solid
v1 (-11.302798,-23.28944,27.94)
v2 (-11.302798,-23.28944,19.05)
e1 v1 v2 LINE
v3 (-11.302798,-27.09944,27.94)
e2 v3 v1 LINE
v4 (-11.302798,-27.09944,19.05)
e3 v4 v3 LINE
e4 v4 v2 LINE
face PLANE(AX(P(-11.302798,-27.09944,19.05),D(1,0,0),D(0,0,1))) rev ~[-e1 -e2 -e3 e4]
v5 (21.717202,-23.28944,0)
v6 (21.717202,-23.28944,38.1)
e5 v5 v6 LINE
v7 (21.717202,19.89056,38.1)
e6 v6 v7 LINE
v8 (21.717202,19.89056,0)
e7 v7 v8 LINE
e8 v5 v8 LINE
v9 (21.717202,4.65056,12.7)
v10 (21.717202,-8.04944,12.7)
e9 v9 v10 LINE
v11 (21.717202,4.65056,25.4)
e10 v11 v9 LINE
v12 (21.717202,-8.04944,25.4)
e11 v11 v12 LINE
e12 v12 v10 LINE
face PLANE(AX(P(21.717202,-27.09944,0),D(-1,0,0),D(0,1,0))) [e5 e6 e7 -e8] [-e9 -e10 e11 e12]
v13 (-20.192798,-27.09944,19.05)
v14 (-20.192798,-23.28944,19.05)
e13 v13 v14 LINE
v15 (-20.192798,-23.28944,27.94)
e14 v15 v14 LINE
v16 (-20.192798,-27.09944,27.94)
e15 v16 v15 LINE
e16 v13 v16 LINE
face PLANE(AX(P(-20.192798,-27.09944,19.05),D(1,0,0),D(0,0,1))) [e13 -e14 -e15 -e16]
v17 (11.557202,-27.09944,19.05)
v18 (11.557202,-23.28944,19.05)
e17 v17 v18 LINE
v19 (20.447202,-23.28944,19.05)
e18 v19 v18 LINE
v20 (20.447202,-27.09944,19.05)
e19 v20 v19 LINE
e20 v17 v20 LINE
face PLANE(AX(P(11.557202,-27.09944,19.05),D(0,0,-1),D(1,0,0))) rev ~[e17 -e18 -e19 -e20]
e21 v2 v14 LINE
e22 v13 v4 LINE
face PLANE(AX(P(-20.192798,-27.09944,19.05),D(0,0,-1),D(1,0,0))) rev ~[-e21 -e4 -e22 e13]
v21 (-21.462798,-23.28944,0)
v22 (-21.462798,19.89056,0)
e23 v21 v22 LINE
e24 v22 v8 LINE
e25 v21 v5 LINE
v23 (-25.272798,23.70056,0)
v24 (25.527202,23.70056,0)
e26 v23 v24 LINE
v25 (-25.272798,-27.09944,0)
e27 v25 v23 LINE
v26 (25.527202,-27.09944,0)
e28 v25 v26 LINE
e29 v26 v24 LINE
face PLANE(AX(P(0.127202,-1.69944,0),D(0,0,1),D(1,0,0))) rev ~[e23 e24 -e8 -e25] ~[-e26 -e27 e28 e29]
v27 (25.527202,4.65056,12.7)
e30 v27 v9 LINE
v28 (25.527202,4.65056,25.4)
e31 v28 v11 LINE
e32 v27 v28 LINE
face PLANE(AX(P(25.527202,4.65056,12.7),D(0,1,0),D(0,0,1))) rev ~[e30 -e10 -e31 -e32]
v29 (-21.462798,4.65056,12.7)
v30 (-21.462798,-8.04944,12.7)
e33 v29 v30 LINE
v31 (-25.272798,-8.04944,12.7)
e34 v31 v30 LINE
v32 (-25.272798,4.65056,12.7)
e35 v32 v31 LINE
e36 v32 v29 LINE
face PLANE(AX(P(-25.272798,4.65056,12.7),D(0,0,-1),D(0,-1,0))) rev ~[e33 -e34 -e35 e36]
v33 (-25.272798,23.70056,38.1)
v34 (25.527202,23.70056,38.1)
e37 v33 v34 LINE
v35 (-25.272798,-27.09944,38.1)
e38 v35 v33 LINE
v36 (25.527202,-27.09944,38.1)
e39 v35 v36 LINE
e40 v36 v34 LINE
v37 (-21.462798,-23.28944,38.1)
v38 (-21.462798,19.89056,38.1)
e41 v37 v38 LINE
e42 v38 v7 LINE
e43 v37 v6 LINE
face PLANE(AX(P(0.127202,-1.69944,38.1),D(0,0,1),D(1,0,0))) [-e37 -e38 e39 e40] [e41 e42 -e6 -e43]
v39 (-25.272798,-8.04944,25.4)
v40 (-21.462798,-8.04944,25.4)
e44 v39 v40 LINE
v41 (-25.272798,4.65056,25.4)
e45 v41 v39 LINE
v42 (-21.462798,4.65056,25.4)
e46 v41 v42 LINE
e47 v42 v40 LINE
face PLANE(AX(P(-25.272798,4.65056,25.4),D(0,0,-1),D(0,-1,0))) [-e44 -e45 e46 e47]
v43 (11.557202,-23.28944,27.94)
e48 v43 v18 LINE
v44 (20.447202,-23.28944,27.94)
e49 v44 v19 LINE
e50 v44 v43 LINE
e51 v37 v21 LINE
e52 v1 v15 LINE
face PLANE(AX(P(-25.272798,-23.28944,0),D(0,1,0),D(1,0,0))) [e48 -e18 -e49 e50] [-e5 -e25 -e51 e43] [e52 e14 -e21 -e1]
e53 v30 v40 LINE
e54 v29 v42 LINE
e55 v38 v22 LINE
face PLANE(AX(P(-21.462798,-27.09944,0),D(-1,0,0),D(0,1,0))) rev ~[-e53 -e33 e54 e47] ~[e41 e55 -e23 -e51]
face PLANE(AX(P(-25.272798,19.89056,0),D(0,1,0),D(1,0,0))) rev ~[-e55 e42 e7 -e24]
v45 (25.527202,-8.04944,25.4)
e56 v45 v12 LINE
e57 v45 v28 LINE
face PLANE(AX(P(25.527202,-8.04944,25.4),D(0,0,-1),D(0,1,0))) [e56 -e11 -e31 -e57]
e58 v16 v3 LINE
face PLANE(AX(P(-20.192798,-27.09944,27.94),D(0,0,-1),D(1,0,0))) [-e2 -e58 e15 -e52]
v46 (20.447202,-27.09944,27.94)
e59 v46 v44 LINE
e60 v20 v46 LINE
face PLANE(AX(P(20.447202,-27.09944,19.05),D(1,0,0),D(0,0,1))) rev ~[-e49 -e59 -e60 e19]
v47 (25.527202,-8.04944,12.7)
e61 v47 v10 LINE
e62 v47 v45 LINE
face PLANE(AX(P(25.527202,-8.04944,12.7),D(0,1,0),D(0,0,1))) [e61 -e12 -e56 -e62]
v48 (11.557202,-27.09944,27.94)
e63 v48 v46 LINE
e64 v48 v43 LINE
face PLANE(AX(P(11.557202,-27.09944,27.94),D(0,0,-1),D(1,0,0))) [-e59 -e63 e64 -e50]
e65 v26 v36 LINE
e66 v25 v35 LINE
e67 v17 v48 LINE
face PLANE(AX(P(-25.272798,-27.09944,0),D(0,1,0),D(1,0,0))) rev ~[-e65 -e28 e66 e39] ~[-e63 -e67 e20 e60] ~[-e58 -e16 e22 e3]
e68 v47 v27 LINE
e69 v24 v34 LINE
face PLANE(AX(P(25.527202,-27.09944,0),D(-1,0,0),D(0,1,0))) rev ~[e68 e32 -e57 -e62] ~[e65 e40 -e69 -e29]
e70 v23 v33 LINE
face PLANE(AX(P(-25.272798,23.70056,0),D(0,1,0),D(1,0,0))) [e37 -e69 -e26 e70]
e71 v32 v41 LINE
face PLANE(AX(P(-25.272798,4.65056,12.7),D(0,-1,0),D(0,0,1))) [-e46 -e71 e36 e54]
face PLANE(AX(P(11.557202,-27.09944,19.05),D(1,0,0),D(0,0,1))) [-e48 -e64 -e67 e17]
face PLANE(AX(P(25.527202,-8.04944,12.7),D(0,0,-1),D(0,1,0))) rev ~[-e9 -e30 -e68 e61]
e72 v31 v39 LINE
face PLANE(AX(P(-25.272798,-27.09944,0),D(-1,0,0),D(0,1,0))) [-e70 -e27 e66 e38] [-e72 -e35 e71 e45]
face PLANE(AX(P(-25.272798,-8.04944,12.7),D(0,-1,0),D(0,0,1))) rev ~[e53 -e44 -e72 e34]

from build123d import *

# Parameters (mm, degrees)
F0_W      = 50.8
F0_H      = 50.8
F1_DEPTH  = 38.1
F2_T      = -3.81
F10_W     = 12.7
F10_H     = 12.7
F11_DEPTH = 25.4
F12_W     = 12.7
F12_H     = 12.7
F13_DEPTH = 25.4
F14_W     = 8.89
F14_H     = 8.89
F15_DEPTH = 25.4


# Not quite as in the source:
# - the program builds the solid bodies; features that only make, move or delete a surface that nothing else refers to are left out


with BuildPart() as f1:
    # F0 (on Top) → F1 (new body)
    with BuildSketch(Plane.XY):
        with Locations((0.1272018999, -1.6994403997)):
            Rectangle(F0_W, F0_H)
    extrude(amount=F1_DEPTH)

    # F2
    f2_openings = [f1.faces().sort_by_distance(p)[0] for p in [
        (0.127202, -1.69944, 38.1),
        (0.127202, -1.69944, 0),
    ]]
    offset(amount=F2_T, openings=f2_openings)

    # F10 (on face) → F11 (cut)
    with BuildSketch(Plane.YZ.offset(25.5272018999)):
        with Locations((-1.6994403997, 19.05)):
            Rectangle(F10_W, F10_H)
    extrude(amount=-F11_DEPTH, mode=Mode.SUBTRACT)

    # F12 (on face) → F13 (cut)
    with BuildSketch(Plane(origin=(-25.2727981001, 0, 0), x_dir=(0, -1, 0), z_dir=(-1, 0, 0))):
        with Locations((1.6994403997, 19.05)):
            Rectangle(F12_W, F12_H)
    extrude(amount=-F13_DEPTH, mode=Mode.SUBTRACT)

    # F14 (on face) → F15 (cut)
    with BuildSketch(Plane.XZ.offset(27.0994403997)):
        with Locations((16.0022018999, 23.495)):
            Rectangle(F14_W, F14_H)
        with Locations((-15.7477981001, 23.495)):
            Rectangle(F14_W, F14_H)
    extrude(amount=-F15_DEPTH, mode=Mode.SUBTRACT)


solid = f1.part
